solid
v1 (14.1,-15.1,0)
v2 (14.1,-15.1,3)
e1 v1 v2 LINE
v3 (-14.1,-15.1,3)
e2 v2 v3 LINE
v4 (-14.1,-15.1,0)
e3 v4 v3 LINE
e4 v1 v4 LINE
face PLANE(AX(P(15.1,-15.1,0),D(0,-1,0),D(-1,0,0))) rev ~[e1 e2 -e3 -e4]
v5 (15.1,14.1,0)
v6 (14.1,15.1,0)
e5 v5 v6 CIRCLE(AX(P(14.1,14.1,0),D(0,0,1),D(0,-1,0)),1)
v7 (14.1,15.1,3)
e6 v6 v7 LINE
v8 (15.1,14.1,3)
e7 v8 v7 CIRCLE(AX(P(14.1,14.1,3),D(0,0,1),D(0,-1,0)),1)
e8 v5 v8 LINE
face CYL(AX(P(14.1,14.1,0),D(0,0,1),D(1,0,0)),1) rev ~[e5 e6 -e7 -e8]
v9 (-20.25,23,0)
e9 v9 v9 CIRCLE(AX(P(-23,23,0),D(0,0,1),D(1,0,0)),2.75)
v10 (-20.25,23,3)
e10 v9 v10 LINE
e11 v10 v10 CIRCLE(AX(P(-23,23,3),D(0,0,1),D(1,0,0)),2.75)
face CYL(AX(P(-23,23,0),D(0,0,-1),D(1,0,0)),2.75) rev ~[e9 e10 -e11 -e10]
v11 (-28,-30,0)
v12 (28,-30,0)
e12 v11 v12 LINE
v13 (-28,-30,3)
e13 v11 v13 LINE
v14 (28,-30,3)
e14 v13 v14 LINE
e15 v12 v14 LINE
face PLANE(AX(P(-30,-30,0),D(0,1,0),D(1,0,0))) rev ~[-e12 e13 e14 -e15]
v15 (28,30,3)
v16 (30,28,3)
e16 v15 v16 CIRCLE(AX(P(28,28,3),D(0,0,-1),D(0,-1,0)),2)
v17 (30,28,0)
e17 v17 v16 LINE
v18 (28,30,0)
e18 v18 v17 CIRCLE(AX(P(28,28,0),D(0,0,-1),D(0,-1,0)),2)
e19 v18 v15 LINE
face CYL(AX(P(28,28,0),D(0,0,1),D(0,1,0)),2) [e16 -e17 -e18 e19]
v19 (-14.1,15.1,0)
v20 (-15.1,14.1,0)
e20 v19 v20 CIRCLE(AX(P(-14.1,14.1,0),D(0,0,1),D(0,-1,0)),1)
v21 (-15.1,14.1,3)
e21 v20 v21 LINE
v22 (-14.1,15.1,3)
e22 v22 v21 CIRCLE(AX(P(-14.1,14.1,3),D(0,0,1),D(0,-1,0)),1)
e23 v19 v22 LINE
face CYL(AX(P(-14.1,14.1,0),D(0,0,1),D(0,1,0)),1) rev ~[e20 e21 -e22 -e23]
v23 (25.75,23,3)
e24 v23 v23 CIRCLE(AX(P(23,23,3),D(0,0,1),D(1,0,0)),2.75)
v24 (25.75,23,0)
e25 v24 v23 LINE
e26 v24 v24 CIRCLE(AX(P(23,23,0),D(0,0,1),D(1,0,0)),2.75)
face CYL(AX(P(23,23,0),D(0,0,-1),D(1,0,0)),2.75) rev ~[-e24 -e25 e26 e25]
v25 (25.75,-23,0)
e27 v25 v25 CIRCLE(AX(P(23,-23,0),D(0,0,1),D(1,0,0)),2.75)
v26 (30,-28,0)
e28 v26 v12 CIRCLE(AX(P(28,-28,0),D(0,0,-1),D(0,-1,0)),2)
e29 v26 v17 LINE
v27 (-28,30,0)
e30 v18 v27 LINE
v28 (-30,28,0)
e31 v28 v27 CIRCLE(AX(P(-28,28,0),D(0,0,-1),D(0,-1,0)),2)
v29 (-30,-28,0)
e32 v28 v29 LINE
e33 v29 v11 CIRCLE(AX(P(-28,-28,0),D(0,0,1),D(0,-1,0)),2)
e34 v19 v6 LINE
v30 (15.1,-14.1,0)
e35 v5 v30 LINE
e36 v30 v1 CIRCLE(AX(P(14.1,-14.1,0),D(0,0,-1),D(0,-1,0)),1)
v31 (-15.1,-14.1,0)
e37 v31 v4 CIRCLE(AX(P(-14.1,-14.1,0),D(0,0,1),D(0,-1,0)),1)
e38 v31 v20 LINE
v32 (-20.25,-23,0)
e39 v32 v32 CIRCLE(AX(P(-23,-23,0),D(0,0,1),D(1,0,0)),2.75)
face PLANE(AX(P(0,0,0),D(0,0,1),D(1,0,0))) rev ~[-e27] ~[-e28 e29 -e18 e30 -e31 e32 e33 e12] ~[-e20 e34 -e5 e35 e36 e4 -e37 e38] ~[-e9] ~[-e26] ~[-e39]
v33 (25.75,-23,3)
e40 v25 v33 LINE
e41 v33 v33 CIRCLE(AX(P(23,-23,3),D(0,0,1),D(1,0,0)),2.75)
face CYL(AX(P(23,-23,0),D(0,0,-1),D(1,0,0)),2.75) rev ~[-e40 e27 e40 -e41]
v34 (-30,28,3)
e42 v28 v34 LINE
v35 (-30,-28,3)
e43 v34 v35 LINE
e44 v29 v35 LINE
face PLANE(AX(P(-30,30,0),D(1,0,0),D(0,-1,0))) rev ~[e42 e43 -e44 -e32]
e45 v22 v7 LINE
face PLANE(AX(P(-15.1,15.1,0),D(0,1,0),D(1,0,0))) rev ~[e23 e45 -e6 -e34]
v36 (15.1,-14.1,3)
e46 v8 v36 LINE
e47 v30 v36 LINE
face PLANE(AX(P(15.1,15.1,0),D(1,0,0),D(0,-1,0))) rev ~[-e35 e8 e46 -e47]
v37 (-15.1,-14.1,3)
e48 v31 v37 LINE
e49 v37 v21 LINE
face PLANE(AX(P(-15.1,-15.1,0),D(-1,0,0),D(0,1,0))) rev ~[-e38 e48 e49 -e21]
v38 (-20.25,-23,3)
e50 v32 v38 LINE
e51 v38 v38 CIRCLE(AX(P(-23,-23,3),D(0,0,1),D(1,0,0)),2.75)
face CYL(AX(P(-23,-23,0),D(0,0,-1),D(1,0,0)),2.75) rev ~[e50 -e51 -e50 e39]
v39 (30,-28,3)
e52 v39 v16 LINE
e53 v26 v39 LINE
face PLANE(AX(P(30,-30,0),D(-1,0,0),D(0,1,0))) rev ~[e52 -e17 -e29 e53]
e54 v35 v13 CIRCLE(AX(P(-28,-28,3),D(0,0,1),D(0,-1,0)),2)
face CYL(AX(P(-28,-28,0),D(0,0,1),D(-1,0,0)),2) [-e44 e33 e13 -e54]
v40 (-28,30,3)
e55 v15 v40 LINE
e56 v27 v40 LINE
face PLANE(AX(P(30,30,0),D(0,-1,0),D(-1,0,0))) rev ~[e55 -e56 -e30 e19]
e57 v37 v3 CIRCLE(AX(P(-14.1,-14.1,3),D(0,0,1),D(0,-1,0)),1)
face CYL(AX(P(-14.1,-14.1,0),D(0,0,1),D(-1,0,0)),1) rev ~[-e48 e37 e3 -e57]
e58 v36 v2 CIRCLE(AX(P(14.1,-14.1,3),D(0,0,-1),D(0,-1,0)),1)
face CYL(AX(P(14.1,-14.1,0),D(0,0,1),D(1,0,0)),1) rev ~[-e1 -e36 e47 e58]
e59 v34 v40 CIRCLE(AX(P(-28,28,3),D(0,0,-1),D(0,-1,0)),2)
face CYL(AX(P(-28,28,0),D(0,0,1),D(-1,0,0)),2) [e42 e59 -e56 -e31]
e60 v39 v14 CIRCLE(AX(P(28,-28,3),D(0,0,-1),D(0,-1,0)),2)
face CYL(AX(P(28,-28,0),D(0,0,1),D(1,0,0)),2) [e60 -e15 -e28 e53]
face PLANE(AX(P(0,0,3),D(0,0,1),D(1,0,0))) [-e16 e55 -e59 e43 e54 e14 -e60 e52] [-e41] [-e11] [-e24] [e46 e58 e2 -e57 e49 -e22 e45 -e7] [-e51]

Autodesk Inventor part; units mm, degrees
ref_plane "YZ Plane" through (0, 0, 0) normal (1, 0, 0) x (0, 1, 0)
ref_plane "XZ Plane" through (0, 0, 0) normal (0, 1, 0) x (-1, 0, 0)
ref_plane "XY Plane" through (0, 0, 0) normal (0, 0, 1) x (1, 0, 0)
sketch "Sketch1" plane through (0, 0, 0) normal (0, 0, 1) x (1, 0, 0)
  line L0 (-30, -30) -> (30, -30)
  line L1 (30, -30) -> (30, 30)
  line L2 (30, 30) -> (-30, 30)
  line L3 (-30, 30) -> (-30, -30)
  line L4 (-30, -30) -> (30, 30) construction
  line L5 (30, -30) -> (-30, 30) construction
  line L6 (15.1, -15.1) -> (-15.1, -15.1)
  line L7 (-15.1, -15.1) -> (-15.1, 15.1)
  line L8 (-15.1, 15.1) -> (15.1, 15.1)
  line L9 (15.1, 15.1) -> (15.1, -15.1)
  line L10 (15.1, -15.1) -> (-15.1, 15.1) construction
  line L11 (-15.1, -15.1) -> (15.1, 15.1) construction
  circle A0 centre (-23, -23) radius 2.75
  circle A1 centre (23, -23) radius 2.75
  circle A2 centre (23, 23) radius 2.75
  circle A3 centre (-23, 23) radius 2.75
  line L12 (25.75, 25.75) -> (-25.75, 25.75) construction
  line L13 (-25.75, 25.75) -> (-25.75, -25.75) construction
  line L14 (-25.75, -25.75) -> (25.75, -25.75) construction
  line L15 (25.75, -25.75) -> (25.75, 25.75) construction
  line L16 (25.75, 25.75) -> (-25.75, -25.75) construction
  line L17 (-25.75, 25.75) -> (25.75, -25.75) construction
  line L18 (23, 23) -> (-23, 23) construction
  line L19 (-23, 23) -> (-23, -23) construction
  line L20 (-23, -23) -> (23, -23) construction
  line L21 (23, -23) -> (23, 23) construction
  line L22 (23, 23) -> (-23, -23) construction
  line L23 (-23, 23) -> (23, -23) construction
  point P0 (0, 0)
  dimension "d172" = 30.2
  dimension "d190" = 5.5
  dimension "d191" = 46
  dimension "d192" = 60
extrude "Plate5" add sketch "Sketch1" along normal blind 3
fillet "Corner Round1" radius 2 4 edges at (30, 30, 1.5) (-30, 30, 1.5) (-30, -30, 1.5) (30, -30, 1.5)
fillet "Corner Round2" radius 1 4 edges at (-15.1, 15.1, 1.5) (-15.1, -15.1, 1.5) (15.1, -15.1, 1.5) (15.1, 15.1, 1.5)
properties part number "SLM 1425 FDS Way FLANGE" material "Stainless Steel"
